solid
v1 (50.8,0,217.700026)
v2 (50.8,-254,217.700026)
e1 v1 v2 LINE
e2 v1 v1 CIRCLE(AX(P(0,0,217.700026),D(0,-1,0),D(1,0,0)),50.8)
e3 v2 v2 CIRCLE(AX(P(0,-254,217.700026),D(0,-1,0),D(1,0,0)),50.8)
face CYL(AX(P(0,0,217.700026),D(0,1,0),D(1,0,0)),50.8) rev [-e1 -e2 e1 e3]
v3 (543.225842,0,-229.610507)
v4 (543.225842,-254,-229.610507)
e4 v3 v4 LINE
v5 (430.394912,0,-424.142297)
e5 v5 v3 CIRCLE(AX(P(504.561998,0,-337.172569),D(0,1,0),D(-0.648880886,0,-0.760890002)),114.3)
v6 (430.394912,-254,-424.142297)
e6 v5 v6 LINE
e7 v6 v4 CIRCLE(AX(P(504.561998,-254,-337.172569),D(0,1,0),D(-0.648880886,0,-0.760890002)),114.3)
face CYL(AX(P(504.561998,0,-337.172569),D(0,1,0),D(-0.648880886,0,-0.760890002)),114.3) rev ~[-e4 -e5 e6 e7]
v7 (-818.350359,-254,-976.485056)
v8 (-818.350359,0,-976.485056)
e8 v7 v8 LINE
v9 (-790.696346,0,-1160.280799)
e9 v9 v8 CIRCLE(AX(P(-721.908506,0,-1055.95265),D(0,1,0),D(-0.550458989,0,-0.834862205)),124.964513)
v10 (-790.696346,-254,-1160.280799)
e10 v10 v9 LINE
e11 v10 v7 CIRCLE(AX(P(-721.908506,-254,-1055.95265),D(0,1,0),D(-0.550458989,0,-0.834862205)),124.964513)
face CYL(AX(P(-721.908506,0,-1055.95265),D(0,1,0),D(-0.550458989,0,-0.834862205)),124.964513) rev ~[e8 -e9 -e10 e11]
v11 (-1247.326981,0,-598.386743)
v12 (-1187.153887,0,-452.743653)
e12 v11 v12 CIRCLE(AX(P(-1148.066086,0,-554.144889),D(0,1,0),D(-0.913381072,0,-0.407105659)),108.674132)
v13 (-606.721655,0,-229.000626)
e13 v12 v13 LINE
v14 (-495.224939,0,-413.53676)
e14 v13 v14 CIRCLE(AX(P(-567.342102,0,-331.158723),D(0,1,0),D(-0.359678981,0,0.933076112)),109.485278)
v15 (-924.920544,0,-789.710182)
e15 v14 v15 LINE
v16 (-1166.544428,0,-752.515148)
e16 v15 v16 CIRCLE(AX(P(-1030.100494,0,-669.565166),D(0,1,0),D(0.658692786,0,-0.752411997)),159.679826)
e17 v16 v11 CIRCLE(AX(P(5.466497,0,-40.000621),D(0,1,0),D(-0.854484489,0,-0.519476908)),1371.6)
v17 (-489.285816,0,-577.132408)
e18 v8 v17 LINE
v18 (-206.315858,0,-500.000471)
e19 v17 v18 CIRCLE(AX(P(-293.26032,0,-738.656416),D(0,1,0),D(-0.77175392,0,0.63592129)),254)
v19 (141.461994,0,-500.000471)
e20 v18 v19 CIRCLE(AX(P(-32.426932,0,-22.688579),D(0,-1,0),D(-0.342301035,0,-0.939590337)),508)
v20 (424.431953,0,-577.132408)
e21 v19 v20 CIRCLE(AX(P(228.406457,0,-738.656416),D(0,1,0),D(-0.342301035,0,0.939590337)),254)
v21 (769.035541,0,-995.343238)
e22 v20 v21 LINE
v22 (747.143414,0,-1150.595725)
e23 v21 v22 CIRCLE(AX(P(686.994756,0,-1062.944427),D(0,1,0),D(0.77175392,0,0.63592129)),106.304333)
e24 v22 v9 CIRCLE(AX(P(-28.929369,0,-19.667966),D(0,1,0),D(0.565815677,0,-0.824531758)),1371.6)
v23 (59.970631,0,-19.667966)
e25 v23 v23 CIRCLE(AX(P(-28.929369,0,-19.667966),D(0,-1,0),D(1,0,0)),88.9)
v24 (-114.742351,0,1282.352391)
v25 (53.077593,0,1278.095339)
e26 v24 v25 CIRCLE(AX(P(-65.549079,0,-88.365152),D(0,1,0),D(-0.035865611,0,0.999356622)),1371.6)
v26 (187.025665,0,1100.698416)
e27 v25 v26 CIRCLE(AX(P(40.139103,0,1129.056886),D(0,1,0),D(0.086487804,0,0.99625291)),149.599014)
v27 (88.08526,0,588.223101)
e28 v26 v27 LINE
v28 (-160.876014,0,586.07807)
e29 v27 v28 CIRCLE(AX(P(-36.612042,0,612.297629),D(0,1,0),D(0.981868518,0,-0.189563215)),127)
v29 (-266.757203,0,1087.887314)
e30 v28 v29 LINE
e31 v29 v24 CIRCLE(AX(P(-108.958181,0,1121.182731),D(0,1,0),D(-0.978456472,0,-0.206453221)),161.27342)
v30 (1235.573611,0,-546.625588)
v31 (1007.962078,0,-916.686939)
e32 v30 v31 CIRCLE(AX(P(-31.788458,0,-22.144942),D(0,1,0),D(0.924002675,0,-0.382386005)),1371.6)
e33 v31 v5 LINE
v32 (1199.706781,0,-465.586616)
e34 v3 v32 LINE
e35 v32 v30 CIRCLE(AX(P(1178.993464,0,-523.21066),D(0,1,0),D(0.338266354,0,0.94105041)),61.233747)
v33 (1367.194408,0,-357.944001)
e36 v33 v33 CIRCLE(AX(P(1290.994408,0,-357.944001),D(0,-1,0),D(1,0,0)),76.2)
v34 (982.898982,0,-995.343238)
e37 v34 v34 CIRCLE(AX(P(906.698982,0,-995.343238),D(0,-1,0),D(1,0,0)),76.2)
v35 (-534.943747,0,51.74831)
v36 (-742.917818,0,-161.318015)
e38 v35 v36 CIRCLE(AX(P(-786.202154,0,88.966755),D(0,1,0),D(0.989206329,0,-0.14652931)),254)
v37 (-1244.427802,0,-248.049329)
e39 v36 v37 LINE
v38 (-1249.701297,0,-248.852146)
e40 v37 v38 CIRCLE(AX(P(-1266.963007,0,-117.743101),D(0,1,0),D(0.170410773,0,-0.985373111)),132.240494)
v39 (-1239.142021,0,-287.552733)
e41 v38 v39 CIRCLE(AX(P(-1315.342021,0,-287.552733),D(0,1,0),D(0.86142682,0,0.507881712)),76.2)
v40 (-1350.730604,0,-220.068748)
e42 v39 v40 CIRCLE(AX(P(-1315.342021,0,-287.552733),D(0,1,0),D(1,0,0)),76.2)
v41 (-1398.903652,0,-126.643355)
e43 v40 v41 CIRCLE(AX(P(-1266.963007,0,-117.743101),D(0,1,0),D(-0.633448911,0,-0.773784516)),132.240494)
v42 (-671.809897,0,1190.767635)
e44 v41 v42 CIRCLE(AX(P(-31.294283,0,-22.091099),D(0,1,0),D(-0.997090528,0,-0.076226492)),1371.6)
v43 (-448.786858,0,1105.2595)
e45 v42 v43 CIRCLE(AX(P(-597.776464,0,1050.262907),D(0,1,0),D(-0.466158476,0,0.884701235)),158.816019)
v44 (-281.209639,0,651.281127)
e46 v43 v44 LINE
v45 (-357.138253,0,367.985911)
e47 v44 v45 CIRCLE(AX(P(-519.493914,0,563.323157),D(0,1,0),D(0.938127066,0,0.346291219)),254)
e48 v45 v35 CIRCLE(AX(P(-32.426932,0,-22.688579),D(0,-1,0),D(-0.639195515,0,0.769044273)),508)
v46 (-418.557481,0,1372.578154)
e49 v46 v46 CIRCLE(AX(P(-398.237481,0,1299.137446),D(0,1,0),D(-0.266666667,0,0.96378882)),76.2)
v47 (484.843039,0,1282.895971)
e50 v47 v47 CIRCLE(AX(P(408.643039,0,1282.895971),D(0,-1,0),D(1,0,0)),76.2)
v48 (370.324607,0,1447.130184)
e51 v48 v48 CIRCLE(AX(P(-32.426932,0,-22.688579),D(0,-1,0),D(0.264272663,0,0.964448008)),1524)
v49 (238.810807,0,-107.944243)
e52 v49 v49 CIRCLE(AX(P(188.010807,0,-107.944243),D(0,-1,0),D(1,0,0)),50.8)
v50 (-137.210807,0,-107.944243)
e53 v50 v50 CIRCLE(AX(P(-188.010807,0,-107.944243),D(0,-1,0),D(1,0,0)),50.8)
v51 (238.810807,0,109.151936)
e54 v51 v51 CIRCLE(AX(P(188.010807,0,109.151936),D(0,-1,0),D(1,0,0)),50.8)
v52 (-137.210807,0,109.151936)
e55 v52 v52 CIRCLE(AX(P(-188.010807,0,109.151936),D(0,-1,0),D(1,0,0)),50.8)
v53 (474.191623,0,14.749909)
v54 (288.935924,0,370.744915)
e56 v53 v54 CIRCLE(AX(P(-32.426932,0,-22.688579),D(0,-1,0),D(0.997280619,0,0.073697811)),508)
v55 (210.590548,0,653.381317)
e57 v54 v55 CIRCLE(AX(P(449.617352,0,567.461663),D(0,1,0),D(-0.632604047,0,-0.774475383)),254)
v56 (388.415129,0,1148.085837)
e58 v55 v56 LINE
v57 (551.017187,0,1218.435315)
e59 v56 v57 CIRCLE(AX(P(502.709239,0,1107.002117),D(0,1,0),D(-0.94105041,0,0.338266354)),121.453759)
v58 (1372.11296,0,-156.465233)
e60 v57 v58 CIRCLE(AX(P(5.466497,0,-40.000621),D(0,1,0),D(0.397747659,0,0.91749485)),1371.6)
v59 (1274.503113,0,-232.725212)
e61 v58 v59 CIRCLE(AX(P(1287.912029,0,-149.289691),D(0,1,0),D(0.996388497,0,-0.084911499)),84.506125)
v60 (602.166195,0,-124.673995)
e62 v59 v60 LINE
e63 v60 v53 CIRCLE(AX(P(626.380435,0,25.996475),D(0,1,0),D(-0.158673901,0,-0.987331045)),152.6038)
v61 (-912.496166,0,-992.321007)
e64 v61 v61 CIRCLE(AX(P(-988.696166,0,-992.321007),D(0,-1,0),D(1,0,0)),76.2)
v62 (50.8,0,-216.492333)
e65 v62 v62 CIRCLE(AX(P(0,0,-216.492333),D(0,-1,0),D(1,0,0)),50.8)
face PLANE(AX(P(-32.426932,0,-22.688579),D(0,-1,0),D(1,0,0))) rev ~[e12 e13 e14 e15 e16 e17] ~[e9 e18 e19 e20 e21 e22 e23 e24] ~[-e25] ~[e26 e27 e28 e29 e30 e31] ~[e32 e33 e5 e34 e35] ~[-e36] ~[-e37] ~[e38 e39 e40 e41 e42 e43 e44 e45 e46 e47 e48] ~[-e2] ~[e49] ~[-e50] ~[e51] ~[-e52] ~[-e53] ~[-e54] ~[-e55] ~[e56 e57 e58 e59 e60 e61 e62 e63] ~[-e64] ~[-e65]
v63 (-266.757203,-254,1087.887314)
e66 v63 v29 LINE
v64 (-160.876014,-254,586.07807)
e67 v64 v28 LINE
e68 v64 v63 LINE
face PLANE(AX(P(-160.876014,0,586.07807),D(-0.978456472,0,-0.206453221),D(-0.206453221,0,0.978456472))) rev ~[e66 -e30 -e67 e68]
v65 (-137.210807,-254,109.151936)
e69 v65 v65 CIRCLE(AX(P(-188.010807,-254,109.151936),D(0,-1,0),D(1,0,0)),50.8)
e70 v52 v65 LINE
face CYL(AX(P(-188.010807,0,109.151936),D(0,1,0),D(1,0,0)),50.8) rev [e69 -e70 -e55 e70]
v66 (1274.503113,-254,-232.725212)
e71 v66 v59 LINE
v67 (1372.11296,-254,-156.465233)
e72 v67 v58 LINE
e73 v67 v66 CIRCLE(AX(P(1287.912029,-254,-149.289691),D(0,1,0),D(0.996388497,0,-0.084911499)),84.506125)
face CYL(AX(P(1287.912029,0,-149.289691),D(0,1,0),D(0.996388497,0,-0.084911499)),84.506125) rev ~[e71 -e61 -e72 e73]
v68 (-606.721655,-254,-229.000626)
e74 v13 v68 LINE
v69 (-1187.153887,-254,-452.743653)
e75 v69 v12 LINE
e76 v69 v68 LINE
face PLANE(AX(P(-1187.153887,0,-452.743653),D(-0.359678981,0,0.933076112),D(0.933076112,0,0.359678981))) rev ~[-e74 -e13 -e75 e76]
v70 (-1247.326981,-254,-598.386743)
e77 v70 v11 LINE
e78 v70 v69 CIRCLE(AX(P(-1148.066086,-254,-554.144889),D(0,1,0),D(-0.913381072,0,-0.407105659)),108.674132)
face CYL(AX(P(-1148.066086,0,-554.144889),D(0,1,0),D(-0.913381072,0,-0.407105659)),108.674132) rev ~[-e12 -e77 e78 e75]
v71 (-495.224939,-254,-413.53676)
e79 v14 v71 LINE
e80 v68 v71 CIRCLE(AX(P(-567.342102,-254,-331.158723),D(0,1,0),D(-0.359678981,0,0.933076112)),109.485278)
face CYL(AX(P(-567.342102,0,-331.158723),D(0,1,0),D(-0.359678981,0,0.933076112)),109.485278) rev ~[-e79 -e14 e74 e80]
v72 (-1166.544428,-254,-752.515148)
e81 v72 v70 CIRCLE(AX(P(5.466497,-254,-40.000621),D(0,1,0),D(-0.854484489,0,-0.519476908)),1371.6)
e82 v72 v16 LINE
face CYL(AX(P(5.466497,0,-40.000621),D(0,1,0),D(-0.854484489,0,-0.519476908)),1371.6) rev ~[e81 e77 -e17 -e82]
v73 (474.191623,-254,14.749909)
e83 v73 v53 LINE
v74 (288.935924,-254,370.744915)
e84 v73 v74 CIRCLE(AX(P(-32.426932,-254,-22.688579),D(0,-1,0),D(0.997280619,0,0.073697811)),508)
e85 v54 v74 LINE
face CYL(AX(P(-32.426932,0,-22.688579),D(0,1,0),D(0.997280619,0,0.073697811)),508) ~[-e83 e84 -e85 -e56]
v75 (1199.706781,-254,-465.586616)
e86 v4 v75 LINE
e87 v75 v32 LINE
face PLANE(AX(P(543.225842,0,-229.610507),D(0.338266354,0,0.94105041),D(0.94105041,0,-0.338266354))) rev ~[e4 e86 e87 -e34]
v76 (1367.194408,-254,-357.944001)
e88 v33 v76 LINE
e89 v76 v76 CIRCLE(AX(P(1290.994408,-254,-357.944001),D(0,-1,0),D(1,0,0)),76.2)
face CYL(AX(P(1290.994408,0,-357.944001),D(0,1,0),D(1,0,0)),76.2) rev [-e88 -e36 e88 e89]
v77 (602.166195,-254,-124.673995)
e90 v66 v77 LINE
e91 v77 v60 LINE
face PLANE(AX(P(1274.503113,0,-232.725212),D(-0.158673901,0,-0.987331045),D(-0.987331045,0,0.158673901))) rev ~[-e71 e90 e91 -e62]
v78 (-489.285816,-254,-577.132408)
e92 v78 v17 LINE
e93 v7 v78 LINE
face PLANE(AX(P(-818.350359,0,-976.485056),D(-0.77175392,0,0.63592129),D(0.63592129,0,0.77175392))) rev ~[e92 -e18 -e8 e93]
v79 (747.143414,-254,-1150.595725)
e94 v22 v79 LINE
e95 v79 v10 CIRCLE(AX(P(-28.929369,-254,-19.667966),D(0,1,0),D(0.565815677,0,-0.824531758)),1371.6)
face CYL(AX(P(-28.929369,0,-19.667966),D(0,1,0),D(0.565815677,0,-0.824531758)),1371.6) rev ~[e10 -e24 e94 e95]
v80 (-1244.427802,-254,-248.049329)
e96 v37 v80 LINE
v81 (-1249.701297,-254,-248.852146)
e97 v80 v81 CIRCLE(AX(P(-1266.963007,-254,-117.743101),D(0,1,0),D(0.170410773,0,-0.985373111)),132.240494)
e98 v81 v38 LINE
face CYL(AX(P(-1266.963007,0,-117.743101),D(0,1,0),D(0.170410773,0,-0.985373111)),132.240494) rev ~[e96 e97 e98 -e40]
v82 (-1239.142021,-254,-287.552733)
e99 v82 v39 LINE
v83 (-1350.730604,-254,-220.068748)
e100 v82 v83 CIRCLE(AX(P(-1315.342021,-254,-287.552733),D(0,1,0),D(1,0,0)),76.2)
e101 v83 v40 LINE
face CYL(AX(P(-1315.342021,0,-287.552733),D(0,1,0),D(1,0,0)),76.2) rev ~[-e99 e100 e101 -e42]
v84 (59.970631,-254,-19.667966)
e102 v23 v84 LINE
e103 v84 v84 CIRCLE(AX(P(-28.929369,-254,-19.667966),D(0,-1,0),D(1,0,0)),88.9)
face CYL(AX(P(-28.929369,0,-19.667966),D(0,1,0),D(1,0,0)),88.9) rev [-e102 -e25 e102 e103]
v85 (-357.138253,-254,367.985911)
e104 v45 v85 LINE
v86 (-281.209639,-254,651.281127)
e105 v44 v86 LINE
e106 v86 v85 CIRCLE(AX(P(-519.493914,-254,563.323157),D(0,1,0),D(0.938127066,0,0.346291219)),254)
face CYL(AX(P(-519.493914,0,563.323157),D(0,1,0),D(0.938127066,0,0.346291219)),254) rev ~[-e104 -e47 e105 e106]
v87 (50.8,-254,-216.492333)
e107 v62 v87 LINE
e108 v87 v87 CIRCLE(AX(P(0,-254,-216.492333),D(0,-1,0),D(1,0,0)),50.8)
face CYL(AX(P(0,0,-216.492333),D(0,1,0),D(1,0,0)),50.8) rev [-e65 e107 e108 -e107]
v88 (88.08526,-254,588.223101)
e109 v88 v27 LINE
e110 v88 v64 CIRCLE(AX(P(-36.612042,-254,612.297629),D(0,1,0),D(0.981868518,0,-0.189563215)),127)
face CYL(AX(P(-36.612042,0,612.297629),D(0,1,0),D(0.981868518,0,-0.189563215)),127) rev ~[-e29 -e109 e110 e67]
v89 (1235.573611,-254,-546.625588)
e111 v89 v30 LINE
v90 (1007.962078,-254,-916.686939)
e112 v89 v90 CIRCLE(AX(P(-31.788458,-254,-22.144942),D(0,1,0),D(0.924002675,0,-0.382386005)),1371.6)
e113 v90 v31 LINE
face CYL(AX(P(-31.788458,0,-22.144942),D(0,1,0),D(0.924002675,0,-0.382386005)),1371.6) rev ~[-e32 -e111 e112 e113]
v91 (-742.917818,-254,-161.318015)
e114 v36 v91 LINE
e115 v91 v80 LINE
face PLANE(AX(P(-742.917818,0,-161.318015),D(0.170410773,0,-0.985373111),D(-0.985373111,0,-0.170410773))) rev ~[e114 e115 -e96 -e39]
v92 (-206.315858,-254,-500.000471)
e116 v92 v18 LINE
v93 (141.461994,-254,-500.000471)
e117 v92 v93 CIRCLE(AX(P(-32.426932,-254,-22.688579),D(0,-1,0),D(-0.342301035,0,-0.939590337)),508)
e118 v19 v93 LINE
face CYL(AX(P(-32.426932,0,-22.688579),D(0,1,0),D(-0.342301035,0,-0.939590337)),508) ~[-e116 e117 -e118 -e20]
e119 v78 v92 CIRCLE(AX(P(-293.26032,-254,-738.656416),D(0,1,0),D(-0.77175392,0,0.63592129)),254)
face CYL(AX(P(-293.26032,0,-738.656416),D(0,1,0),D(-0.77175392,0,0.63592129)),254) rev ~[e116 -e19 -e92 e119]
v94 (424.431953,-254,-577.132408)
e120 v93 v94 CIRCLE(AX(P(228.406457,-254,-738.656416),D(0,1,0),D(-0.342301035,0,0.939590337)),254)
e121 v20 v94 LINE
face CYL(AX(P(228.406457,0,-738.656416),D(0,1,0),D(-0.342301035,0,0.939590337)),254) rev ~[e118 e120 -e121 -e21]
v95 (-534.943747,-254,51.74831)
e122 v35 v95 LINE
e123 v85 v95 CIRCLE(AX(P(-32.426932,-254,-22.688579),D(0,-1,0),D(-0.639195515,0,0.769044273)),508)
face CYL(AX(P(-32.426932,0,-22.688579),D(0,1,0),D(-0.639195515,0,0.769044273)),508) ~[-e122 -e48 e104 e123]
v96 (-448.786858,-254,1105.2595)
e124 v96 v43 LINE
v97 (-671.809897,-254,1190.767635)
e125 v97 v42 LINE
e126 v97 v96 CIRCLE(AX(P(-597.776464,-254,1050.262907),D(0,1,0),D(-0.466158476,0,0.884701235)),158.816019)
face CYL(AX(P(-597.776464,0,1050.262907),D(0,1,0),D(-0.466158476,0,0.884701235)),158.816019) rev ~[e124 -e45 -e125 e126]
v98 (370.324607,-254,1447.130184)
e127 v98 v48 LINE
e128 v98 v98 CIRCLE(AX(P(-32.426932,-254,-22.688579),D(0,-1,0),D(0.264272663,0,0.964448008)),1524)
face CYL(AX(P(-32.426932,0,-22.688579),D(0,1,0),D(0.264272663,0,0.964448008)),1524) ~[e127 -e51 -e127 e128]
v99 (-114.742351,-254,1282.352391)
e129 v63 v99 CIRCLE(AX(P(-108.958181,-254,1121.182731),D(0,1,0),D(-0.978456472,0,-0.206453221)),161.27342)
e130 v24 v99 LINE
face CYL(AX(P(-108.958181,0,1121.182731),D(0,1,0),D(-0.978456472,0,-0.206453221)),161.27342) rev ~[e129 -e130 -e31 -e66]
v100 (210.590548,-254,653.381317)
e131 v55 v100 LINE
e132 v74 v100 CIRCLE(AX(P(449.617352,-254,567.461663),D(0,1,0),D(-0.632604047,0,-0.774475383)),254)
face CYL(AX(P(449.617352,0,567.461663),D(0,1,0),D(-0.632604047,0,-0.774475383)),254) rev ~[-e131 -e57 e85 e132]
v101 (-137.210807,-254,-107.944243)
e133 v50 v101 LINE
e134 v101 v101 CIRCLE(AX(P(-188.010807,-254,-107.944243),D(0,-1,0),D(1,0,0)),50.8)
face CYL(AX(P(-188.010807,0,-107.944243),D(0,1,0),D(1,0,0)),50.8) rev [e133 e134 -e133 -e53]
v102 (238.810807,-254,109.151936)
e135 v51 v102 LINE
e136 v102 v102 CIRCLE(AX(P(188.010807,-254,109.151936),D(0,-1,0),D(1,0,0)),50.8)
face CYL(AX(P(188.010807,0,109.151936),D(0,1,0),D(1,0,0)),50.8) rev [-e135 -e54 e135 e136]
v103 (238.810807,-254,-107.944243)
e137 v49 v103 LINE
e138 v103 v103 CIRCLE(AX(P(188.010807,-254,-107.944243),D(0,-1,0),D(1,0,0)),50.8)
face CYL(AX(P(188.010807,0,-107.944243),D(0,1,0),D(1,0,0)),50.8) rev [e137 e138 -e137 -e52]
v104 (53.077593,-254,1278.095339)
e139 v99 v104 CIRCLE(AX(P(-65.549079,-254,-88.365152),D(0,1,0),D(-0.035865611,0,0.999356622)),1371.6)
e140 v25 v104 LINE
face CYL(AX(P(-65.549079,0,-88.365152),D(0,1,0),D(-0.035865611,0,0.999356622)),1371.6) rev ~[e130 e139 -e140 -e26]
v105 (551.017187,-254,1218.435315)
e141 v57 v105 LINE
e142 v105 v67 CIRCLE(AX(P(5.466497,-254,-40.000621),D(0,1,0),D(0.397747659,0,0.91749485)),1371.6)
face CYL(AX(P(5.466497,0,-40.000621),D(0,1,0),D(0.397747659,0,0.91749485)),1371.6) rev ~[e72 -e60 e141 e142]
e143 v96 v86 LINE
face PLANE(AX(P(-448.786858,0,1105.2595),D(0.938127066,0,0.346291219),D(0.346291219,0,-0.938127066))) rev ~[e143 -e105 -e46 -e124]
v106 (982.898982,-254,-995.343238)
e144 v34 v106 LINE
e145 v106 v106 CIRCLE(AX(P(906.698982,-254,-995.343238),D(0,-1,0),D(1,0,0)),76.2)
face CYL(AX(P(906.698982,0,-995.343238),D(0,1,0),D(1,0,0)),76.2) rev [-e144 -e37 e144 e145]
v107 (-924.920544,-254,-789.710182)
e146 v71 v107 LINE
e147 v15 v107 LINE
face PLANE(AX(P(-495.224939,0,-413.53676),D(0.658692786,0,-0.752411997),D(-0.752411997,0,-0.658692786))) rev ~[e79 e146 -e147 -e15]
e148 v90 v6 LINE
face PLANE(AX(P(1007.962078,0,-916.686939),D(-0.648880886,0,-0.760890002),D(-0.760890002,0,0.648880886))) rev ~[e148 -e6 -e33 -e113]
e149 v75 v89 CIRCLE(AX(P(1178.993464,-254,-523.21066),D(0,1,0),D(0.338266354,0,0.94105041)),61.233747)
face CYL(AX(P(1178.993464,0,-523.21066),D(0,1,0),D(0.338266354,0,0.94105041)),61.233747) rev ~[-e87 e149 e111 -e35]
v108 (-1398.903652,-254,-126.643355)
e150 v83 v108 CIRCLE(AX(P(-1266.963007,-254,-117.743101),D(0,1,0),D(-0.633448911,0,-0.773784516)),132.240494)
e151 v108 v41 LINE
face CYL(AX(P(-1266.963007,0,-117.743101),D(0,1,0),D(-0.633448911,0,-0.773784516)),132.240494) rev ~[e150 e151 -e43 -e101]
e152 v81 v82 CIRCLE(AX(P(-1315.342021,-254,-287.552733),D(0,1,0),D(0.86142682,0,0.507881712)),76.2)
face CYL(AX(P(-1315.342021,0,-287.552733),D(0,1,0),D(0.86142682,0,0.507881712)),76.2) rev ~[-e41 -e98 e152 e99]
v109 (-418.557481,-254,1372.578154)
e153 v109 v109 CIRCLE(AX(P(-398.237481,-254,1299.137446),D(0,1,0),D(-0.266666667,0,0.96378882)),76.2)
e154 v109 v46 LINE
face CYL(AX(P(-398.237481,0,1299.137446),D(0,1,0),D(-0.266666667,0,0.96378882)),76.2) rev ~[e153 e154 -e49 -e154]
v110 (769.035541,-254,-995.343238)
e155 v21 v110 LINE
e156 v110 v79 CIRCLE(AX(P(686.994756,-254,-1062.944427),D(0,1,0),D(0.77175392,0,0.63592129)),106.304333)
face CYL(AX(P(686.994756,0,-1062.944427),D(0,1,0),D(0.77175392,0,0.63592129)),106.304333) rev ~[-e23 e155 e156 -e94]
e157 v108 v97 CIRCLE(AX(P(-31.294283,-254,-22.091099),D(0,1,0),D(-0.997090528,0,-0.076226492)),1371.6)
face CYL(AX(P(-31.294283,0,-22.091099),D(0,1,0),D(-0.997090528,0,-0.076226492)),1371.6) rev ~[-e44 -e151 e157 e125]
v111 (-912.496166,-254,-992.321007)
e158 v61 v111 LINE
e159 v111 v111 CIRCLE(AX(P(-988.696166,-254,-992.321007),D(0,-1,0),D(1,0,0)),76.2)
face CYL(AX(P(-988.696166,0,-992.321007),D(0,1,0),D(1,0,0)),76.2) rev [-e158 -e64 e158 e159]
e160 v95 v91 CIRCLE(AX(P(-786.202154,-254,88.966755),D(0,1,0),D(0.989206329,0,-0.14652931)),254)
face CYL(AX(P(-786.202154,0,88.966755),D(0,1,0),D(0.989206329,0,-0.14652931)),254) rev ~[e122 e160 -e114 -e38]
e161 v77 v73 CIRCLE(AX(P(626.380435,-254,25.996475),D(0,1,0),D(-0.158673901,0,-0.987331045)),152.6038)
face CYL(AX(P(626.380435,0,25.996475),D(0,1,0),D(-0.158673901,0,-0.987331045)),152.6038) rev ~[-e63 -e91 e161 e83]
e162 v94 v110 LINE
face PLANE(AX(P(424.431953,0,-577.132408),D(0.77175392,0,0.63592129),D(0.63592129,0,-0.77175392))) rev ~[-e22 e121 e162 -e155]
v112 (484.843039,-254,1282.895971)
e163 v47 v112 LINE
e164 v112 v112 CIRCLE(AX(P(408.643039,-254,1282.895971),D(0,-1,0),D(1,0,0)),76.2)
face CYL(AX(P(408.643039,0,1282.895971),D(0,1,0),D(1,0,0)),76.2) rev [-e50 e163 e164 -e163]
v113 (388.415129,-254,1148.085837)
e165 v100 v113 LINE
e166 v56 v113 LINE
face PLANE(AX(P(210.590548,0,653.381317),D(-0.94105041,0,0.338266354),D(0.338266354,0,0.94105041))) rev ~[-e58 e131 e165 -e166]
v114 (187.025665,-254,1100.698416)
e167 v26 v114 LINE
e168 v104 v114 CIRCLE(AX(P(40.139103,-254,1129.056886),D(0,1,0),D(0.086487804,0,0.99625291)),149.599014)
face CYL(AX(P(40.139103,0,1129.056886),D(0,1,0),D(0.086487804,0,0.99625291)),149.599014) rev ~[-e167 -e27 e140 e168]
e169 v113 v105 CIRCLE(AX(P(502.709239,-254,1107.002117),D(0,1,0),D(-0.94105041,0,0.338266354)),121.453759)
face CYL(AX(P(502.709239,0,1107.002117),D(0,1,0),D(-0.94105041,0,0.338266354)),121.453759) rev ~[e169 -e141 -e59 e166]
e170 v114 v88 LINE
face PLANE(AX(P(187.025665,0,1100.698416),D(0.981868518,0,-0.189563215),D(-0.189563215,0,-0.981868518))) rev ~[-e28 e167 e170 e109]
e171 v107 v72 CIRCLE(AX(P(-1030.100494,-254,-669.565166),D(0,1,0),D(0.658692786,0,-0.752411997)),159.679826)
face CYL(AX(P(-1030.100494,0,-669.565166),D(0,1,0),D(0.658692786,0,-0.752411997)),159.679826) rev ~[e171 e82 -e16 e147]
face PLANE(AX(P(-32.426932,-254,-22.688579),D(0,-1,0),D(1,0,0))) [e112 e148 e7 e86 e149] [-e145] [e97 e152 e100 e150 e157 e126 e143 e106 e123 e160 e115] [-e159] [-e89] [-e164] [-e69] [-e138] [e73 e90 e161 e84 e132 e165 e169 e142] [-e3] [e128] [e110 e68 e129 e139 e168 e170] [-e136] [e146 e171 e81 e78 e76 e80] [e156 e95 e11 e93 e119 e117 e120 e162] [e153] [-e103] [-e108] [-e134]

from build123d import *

# Parameters (mm, degrees)
F0_R     = 76.2
F0_R_2   = 381
F0_R_3   = 50.8
F0_R_4   = 88.9
F1_DEPTH = 254
F2_DEPTH = 25.4


# Not quite as in the source:
# - a feature names something its author has since deleted; it is built from what else it names


with BuildPart() as f1:
    # F0 (on Front) → F1 (new body)
    with BuildSketch(Plane.XZ):
        with BuildLine():
            ThreePointArc((-438.901314327, 1446.1049991127), (-955.2240493061, -1235.5453226133), (1491.5730683675, -22.6885793772))
            ThreePointArc((1491.5730683675, -22.6885793772), (1179.259773896, 901.6443301557), (370.3246068905, 1447.1301843544))
            ThreePointArc((370.3246068905, 1447.1301843544), (-34.357642221, 1501.3101976422), (-438.901314327, 1446.1049991127))
        make_face()
        with Locations((-988.6961662929, -992.3210067458)):
            Circle(F0_R, mode=Mode.SUBTRACT)
        with BuildLine():
            ThreePointArc((-606.7216551205, -229.0006255424), (-473.6333293501, -274.5398912836), (-495.2249387094, -413.5367602623))
            Line((-495.2249387094, -413.5367602623), (-924.9205441456, -789.7101822283))
            ThreePointArc((-924.9205441456, -789.7101822283), (-1054.395078127, -827.3860132201), (-1166.5444280594, -752.5151477225))
            ThreePointArc((-1166.5444280594, -752.5151477225), (-1209.3824603477, -676.7333514431), (-1247.3269806878, -598.386743132))
            ThreePointArc((-1247.3269806878, -598.3867431321), (-1248.5054597896, -512.6479124831), (-1187.1538866182, -452.7436525058))
            Line((-1187.1538866182, -452.7436525058), (-606.7216551205, -229.0006255424))
        make_face(mode=Mode.SUBTRACT)
        with BuildLine():
            ThreePointArc((141.4619942767, -500.0004705408), (295.2046749236, -493.5972434456), (424.4319529016, -577.1324084729))
            Line((424.4319529016, -577.1324084729), (769.0355413702, -995.3432380718))
            ThreePointArc((769.0355413702, -995.3432380718), (792.2577271598, -1077.7875407161), (747.1434138714, -1150.5957249256))
            ThreePointArc((747.1434138714, -1150.5957249256), (-20.2914186453, -1391.2407661373), (-790.6963455322, -1160.2807985063))
            ThreePointArc((-790.6963455322, -1160.2807985063), (-845.482093705, -1074.5456029868), (-818.3503587355, -976.4850558173))
            Line((-818.3503587355, -976.4850558173), (-489.2858161666, -577.1324084729))
            ThreePointArc((-489.2858161666, -577.1324084729), (-360.0585381886, -493.5972434456), (-206.3158575417, -500.0004705408))
            ThreePointArc((-206.3158575417, -500.0004705408), (-32.4269316325, -530.6885793772), (141.4619942767, -500.0004705408))
        make_face(mode=Mode.SUBTRACT)
        with Locations((906.6989819385, -995.3432380718)):
            Circle(F0_R, mode=Mode.SUBTRACT)
        with BuildLine():
            ThreePointArc((430.3949123286, -424.1422965242), (405.6894823481, -279.8252438668), (543.2258419139, -229.6105074281))
            Line((543.2258419139, -229.6105074281), (1199.7067807508, -465.5866163521))
            ThreePointArc((1199.7067807508, -465.5866163521), (1234.9880940634, -498.4281402623), (1235.5736106816, -546.6255876231))
            ThreePointArc((1235.5736106816, -546.6255876231), (1136.5130841881, -740.7255341779), (1007.9620778985, -916.6869388771))
            Line((1007.9620778985, -916.6869388771), (430.3949123286, -424.1422965242))
        make_face(mode=Mode.SUBTRACT)
        with Locations((1290.9944078618, -357.9440014022)):
            Circle(F0_R, mode=Mode.SUBTRACT)
        with BuildLine():
            ThreePointArc((-281.2096390945, 651.2811265205), (-274.1530606998, 497.5670482092), (-357.1382530587, 367.9859113919))
            ThreePointArc((-357.1382530587, 367.9859113919), (-475.2340595777, 226.2809919381), (-534.9437467356, 51.7483102585))
            ThreePointArc((-534.9437467356, 51.7483102585), (-604.4380990733, -88.4531655419), (-742.9178178471, -161.3180151733))
            Line((-742.9178178471, -161.3180151733), (-1244.4278017574, -248.0493286686))
            ThreePointArc((-1244.4278017574, -248.0493286686), (-1247.0605009607, -248.4773302456), (-1249.7012969082, -248.8521464785))
            ThreePointArc((-1249.7012969082, -248.8521464785), (-1241.8292219185, -267.4951052717), (-1239.1420206244, -287.5527329083))
            ThreePointArc((-1239.1420206244, -287.5527329083), (-1354.7744309366, -352.7564522576), (-1350.7306037472, -220.0687482559))
            ThreePointArc((-1350.7306037472, -220.0687482559), (-1384.498479891, -178.3480587885), (-1398.9036517193, -126.6433548101))
            ThreePointArc((-1398.9036517193, -126.6433548101), (-1232.1416568517, 640.6699019346), (-671.8098969036, 1190.7676347983))
            ThreePointArc((-671.8098969036, 1190.7676347983), (-540.9212329656, 1198.5531984137), (-448.7868577428, 1105.2594995344))
            Line((-448.7868577428, 1105.2594995344), (-281.2096390945, 651.2811265205))
        make_face(mode=Mode.SUBTRACT)
        with BuildLine():
            ThreePointArc((-114.7423511713, 1282.3523911945), (-30.7671889932, 1282.7937670811), (53.0775929004, 1278.0953391806))
            ThreePointArc((53.0775929004, 1278.0953391806), (159.5268277635, 1219.2036336842), (187.0256647837, 1100.6984163233))
            Line((187.0256647837, 1100.6984163233), (88.0852600709, 588.2231006784))
            ThreePointArc((88.0852600709, 588.2231006784), (-35.5178603715, 485.3023426218), (-160.8760137018, 586.0780699356))
            Line((-160.8760137018, 586.0780699356), (-266.7572029011, 1087.8873140008))
            ThreePointArc((-266.7572029011, 1087.8873140008), (-236.01734746, 1220.5058617745), (-114.7423511713, 1282.3523911945))
        make_face(mode=Mode.SUBTRACT)
        with BuildLine():
            ThreePointArc((-322.0374814198, 1299.1374459119), (-444.3788728163, 1238.4957770695), (-418.5574814199, 1372.5781539695))
            ThreePointArc((-418.5574814199, 1372.5781539695), (-352.0960900234, 1359.7791147544), (-322.0374814198, 1299.1374459119))
        make_face(mode=Mode.SUBTRACT)
        with Locations((-32.4269316325, -22.6885793772)):
            Circle(F0_R_2, mode=Mode.SUBTRACT)
        with BuildLine():
            ThreePointArc((288.9359244118, 370.7449153269), (204.8470487975, 499.6125767771), (210.5905483924, 653.3813167152))
            Line((210.5905483924, 653.3813167152), (388.4151292153, 1148.0858370123))
            ThreePointArc((388.4151292153, 1148.0858370123), (454.4826315564, 1218.470542292), (551.0171868303, 1218.4353149325))
            ThreePointArc((551.0171868303, 1218.4353149325), (1183.0540170156, 663.2590703336), (1372.1129602001, -156.4652328803))
            ThreePointArc((1372.1129602001, -156.4652328803), (1339.9386899866, -215.8818209167), (1274.5031126993, -232.7252119871))
            Line((1274.5031126993, -232.7252119871), (602.1661946675, -124.6739946667))
            ThreePointArc((602.1661946675, -124.6739946666), (513.9559471896, -77.1958425739), (474.1916227132, 14.7499087429))
            ThreePointArc((474.1916227132, 14.7499087429), (418.2075268436, 211.816398894), (288.9359244118, 370.7449153269))
        make_face(mode=Mode.SUBTRACT)
        with Locations((408.643038686, 1282.8959709801)):
            Circle(F0_R, mode=Mode.SUBTRACT)
        with Locations((-32.4269316325, -22.6885793772)):
            Circle(F0_R_2)
        with Locations((-188.0108067053, -107.9442432979)):
            Circle(F0_R_3, mode=Mode.SUBTRACT)
        with Locations((0, -216.4923331597)):
            Circle(F0_R_3, mode=Mode.SUBTRACT)
        with Locations((188.0108067053, -107.9442432979)):
            Circle(F0_R_3, mode=Mode.SUBTRACT)
        with Locations((-188.0108067053, 109.1519364259)):
            Circle(F0_R_3, mode=Mode.SUBTRACT)
        with Locations((-28.9293689964, -19.6679660958)):
            Circle(F0_R_4, mode=Mode.SUBTRACT)
        with Locations((188.0108067053, 109.1519364259)):
            Circle(F0_R_3, mode=Mode.SUBTRACT)
        with Locations((0, 217.7000262877)):
            Circle(F0_R_3, mode=Mode.SUBTRACT)
    extrude(amount=F1_DEPTH)

    # F0 (on Front) → F2 (join)
    with BuildSketch(Plane.XZ):
        with BuildLine():
            ThreePointArc((-438.901314327, 1446.1049991127), (-955.2240493061, -1235.5453226133), (1491.5730683675, -22.6885793772))
            ThreePointArc((1491.5730683675, -22.6885793772), (1179.259773896, 901.6443301557), (370.3246068905, 1447.1301843544))
            ThreePointArc((370.3246068905, 1447.1301843544), (-34.357642221, 1501.3101976422), (-438.901314327, 1446.1049991127))
        make_face()
        with Locations((-988.6961662929, -992.3210067458)):
            Circle(F0_R, mode=Mode.SUBTRACT)
        with BuildLine():
            ThreePointArc((-606.7216551205, -229.0006255424), (-473.6333293501, -274.5398912836), (-495.2249387094, -413.5367602623))
            Line((-495.2249387094, -413.5367602623), (-924.9205441456, -789.7101822283))
            ThreePointArc((-924.9205441456, -789.7101822283), (-1054.395078127, -827.3860132201), (-1166.5444280594, -752.5151477225))
            ThreePointArc((-1166.5444280594, -752.5151477225), (-1209.3824603477, -676.7333514431), (-1247.3269806878, -598.386743132))
            ThreePointArc((-1247.3269806878, -598.3867431321), (-1248.5054597896, -512.6479124831), (-1187.1538866182, -452.7436525058))
            Line((-1187.1538866182, -452.7436525058), (-606.7216551205, -229.0006255424))
        make_face(mode=Mode.SUBTRACT)
        with BuildLine():
            ThreePointArc((141.4619942767, -500.0004705408), (295.2046749236, -493.5972434456), (424.4319529016, -577.1324084729))
            Line((424.4319529016, -577.1324084729), (769.0355413702, -995.3432380718))
            ThreePointArc((769.0355413702, -995.3432380718), (792.2577271598, -1077.7875407161), (747.1434138714, -1150.5957249256))
            ThreePointArc((747.1434138714, -1150.5957249256), (-20.2914186453, -1391.2407661373), (-790.6963455322, -1160.2807985063))
            ThreePointArc((-790.6963455322, -1160.2807985063), (-845.482093705, -1074.5456029868), (-818.3503587355, -976.4850558173))
            Line((-818.3503587355, -976.4850558173), (-489.2858161666, -577.1324084729))
            ThreePointArc((-489.2858161666, -577.1324084729), (-360.0585381886, -493.5972434456), (-206.3158575417, -500.0004705408))
            ThreePointArc((-206.3158575417, -500.0004705408), (-32.4269316325, -530.6885793772), (141.4619942767, -500.0004705408))
        make_face(mode=Mode.SUBTRACT)
        with Locations((906.6989819385, -995.3432380718)):
            Circle(F0_R, mode=Mode.SUBTRACT)
        with BuildLine():
            ThreePointArc((430.3949123286, -424.1422965242), (405.6894823481, -279.8252438668), (543.2258419139, -229.6105074281))
            Line((543.2258419139, -229.6105074281), (1199.7067807508, -465.5866163521))
            ThreePointArc((1199.7067807508, -465.5866163521), (1234.9880940634, -498.4281402623), (1235.5736106816, -546.6255876231))
            ThreePointArc((1235.5736106816, -546.6255876231), (1136.5130841881, -740.7255341779), (1007.9620778985, -916.6869388771))
            Line((1007.9620778985, -916.6869388771), (430.3949123286, -424.1422965242))
        make_face(mode=Mode.SUBTRACT)
        with Locations((1290.9944078618, -357.9440014022)):
            Circle(F0_R, mode=Mode.SUBTRACT)
        with BuildLine():
            ThreePointArc((-281.2096390945, 651.2811265205), (-274.1530606998, 497.5670482092), (-357.1382530587, 367.9859113919))
            ThreePointArc((-357.1382530587, 367.9859113919), (-475.2340595777, 226.2809919381), (-534.9437467356, 51.7483102585))
            ThreePointArc((-534.9437467356, 51.7483102585), (-604.4380990733, -88.4531655419), (-742.9178178471, -161.3180151733))
            Line((-742.9178178471, -161.3180151733), (-1244.4278017574, -248.0493286686))
            ThreePointArc((-1244.4278017574, -248.0493286686), (-1247.0605009607, -248.4773302456), (-1249.7012969082, -248.8521464785))
            ThreePointArc((-1249.7012969082, -248.8521464785), (-1241.8292219185, -267.4951052717), (-1239.1420206244, -287.5527329083))
            ThreePointArc((-1239.1420206244, -287.5527329083), (-1354.7744309366, -352.7564522576), (-1350.7306037472, -220.0687482559))
            ThreePointArc((-1350.7306037472, -220.0687482559), (-1384.498479891, -178.3480587885), (-1398.9036517193, -126.6433548101))
            ThreePointArc((-1398.9036517193, -126.6433548101), (-1232.1416568517, 640.6699019346), (-671.8098969036, 1190.7676347983))
            ThreePointArc((-671.8098969036, 1190.7676347983), (-540.9212329656, 1198.5531984137), (-448.7868577428, 1105.2594995344))
            Line((-448.7868577428, 1105.2594995344), (-281.2096390945, 651.2811265205))
        make_face(mode=Mode.SUBTRACT)
        with BuildLine():
            ThreePointArc((-114.7423511713, 1282.3523911945), (-30.7671889932, 1282.7937670811), (53.0775929004, 1278.0953391806))
            ThreePointArc((53.0775929004, 1278.0953391806), (159.5268277635, 1219.2036336842), (187.0256647837, 1100.6984163233))
            Line((187.0256647837, 1100.6984163233), (88.0852600709, 588.2231006784))
            ThreePointArc((88.0852600709, 588.2231006784), (-35.5178603715, 485.3023426218), (-160.8760137018, 586.0780699356))
            Line((-160.8760137018, 586.0780699356), (-266.7572029011, 1087.8873140008))
            ThreePointArc((-266.7572029011, 1087.8873140008), (-236.01734746, 1220.5058617745), (-114.7423511713, 1282.3523911945))
        make_face(mode=Mode.SUBTRACT)
        with BuildLine():
            ThreePointArc((-322.0374814198, 1299.1374459119), (-444.3788728163, 1238.4957770695), (-418.5574814199, 1372.5781539695))
            ThreePointArc((-418.5574814199, 1372.5781539695), (-352.0960900234, 1359.7791147544), (-322.0374814198, 1299.1374459119))
        make_face(mode=Mode.SUBTRACT)
        with Locations((-32.4269316325, -22.6885793772)):
            Circle(F0_R_2, mode=Mode.SUBTRACT)
        with BuildLine():
            ThreePointArc((288.9359244118, 370.7449153269), (204.8470487975, 499.6125767771), (210.5905483924, 653.3813167152))
            Line((210.5905483924, 653.3813167152), (388.4151292153, 1148.0858370123))
            ThreePointArc((388.4151292153, 1148.0858370123), (454.4826315564, 1218.470542292), (551.0171868303, 1218.4353149325))
            ThreePointArc((551.0171868303, 1218.4353149325), (1183.0540170156, 663.2590703336), (1372.1129602001, -156.4652328803))
            ThreePointArc((1372.1129602001, -156.4652328803), (1339.9386899866, -215.8818209167), (1274.5031126993, -232.7252119871))
            Line((1274.5031126993, -232.7252119871), (602.1661946675, -124.6739946667))
            ThreePointArc((602.1661946675, -124.6739946666), (513.9559471896, -77.1958425739), (474.1916227132, 14.7499087429))
            ThreePointArc((474.1916227132, 14.7499087429), (418.2075268436, 211.816398894), (288.9359244118, 370.7449153269))
        make_face(mode=Mode.SUBTRACT)
        with Locations((408.643038686, 1282.8959709801)):
            Circle(F0_R, mode=Mode.SUBTRACT)
    extrude(amount=F2_DEPTH)


solid = f1.part
